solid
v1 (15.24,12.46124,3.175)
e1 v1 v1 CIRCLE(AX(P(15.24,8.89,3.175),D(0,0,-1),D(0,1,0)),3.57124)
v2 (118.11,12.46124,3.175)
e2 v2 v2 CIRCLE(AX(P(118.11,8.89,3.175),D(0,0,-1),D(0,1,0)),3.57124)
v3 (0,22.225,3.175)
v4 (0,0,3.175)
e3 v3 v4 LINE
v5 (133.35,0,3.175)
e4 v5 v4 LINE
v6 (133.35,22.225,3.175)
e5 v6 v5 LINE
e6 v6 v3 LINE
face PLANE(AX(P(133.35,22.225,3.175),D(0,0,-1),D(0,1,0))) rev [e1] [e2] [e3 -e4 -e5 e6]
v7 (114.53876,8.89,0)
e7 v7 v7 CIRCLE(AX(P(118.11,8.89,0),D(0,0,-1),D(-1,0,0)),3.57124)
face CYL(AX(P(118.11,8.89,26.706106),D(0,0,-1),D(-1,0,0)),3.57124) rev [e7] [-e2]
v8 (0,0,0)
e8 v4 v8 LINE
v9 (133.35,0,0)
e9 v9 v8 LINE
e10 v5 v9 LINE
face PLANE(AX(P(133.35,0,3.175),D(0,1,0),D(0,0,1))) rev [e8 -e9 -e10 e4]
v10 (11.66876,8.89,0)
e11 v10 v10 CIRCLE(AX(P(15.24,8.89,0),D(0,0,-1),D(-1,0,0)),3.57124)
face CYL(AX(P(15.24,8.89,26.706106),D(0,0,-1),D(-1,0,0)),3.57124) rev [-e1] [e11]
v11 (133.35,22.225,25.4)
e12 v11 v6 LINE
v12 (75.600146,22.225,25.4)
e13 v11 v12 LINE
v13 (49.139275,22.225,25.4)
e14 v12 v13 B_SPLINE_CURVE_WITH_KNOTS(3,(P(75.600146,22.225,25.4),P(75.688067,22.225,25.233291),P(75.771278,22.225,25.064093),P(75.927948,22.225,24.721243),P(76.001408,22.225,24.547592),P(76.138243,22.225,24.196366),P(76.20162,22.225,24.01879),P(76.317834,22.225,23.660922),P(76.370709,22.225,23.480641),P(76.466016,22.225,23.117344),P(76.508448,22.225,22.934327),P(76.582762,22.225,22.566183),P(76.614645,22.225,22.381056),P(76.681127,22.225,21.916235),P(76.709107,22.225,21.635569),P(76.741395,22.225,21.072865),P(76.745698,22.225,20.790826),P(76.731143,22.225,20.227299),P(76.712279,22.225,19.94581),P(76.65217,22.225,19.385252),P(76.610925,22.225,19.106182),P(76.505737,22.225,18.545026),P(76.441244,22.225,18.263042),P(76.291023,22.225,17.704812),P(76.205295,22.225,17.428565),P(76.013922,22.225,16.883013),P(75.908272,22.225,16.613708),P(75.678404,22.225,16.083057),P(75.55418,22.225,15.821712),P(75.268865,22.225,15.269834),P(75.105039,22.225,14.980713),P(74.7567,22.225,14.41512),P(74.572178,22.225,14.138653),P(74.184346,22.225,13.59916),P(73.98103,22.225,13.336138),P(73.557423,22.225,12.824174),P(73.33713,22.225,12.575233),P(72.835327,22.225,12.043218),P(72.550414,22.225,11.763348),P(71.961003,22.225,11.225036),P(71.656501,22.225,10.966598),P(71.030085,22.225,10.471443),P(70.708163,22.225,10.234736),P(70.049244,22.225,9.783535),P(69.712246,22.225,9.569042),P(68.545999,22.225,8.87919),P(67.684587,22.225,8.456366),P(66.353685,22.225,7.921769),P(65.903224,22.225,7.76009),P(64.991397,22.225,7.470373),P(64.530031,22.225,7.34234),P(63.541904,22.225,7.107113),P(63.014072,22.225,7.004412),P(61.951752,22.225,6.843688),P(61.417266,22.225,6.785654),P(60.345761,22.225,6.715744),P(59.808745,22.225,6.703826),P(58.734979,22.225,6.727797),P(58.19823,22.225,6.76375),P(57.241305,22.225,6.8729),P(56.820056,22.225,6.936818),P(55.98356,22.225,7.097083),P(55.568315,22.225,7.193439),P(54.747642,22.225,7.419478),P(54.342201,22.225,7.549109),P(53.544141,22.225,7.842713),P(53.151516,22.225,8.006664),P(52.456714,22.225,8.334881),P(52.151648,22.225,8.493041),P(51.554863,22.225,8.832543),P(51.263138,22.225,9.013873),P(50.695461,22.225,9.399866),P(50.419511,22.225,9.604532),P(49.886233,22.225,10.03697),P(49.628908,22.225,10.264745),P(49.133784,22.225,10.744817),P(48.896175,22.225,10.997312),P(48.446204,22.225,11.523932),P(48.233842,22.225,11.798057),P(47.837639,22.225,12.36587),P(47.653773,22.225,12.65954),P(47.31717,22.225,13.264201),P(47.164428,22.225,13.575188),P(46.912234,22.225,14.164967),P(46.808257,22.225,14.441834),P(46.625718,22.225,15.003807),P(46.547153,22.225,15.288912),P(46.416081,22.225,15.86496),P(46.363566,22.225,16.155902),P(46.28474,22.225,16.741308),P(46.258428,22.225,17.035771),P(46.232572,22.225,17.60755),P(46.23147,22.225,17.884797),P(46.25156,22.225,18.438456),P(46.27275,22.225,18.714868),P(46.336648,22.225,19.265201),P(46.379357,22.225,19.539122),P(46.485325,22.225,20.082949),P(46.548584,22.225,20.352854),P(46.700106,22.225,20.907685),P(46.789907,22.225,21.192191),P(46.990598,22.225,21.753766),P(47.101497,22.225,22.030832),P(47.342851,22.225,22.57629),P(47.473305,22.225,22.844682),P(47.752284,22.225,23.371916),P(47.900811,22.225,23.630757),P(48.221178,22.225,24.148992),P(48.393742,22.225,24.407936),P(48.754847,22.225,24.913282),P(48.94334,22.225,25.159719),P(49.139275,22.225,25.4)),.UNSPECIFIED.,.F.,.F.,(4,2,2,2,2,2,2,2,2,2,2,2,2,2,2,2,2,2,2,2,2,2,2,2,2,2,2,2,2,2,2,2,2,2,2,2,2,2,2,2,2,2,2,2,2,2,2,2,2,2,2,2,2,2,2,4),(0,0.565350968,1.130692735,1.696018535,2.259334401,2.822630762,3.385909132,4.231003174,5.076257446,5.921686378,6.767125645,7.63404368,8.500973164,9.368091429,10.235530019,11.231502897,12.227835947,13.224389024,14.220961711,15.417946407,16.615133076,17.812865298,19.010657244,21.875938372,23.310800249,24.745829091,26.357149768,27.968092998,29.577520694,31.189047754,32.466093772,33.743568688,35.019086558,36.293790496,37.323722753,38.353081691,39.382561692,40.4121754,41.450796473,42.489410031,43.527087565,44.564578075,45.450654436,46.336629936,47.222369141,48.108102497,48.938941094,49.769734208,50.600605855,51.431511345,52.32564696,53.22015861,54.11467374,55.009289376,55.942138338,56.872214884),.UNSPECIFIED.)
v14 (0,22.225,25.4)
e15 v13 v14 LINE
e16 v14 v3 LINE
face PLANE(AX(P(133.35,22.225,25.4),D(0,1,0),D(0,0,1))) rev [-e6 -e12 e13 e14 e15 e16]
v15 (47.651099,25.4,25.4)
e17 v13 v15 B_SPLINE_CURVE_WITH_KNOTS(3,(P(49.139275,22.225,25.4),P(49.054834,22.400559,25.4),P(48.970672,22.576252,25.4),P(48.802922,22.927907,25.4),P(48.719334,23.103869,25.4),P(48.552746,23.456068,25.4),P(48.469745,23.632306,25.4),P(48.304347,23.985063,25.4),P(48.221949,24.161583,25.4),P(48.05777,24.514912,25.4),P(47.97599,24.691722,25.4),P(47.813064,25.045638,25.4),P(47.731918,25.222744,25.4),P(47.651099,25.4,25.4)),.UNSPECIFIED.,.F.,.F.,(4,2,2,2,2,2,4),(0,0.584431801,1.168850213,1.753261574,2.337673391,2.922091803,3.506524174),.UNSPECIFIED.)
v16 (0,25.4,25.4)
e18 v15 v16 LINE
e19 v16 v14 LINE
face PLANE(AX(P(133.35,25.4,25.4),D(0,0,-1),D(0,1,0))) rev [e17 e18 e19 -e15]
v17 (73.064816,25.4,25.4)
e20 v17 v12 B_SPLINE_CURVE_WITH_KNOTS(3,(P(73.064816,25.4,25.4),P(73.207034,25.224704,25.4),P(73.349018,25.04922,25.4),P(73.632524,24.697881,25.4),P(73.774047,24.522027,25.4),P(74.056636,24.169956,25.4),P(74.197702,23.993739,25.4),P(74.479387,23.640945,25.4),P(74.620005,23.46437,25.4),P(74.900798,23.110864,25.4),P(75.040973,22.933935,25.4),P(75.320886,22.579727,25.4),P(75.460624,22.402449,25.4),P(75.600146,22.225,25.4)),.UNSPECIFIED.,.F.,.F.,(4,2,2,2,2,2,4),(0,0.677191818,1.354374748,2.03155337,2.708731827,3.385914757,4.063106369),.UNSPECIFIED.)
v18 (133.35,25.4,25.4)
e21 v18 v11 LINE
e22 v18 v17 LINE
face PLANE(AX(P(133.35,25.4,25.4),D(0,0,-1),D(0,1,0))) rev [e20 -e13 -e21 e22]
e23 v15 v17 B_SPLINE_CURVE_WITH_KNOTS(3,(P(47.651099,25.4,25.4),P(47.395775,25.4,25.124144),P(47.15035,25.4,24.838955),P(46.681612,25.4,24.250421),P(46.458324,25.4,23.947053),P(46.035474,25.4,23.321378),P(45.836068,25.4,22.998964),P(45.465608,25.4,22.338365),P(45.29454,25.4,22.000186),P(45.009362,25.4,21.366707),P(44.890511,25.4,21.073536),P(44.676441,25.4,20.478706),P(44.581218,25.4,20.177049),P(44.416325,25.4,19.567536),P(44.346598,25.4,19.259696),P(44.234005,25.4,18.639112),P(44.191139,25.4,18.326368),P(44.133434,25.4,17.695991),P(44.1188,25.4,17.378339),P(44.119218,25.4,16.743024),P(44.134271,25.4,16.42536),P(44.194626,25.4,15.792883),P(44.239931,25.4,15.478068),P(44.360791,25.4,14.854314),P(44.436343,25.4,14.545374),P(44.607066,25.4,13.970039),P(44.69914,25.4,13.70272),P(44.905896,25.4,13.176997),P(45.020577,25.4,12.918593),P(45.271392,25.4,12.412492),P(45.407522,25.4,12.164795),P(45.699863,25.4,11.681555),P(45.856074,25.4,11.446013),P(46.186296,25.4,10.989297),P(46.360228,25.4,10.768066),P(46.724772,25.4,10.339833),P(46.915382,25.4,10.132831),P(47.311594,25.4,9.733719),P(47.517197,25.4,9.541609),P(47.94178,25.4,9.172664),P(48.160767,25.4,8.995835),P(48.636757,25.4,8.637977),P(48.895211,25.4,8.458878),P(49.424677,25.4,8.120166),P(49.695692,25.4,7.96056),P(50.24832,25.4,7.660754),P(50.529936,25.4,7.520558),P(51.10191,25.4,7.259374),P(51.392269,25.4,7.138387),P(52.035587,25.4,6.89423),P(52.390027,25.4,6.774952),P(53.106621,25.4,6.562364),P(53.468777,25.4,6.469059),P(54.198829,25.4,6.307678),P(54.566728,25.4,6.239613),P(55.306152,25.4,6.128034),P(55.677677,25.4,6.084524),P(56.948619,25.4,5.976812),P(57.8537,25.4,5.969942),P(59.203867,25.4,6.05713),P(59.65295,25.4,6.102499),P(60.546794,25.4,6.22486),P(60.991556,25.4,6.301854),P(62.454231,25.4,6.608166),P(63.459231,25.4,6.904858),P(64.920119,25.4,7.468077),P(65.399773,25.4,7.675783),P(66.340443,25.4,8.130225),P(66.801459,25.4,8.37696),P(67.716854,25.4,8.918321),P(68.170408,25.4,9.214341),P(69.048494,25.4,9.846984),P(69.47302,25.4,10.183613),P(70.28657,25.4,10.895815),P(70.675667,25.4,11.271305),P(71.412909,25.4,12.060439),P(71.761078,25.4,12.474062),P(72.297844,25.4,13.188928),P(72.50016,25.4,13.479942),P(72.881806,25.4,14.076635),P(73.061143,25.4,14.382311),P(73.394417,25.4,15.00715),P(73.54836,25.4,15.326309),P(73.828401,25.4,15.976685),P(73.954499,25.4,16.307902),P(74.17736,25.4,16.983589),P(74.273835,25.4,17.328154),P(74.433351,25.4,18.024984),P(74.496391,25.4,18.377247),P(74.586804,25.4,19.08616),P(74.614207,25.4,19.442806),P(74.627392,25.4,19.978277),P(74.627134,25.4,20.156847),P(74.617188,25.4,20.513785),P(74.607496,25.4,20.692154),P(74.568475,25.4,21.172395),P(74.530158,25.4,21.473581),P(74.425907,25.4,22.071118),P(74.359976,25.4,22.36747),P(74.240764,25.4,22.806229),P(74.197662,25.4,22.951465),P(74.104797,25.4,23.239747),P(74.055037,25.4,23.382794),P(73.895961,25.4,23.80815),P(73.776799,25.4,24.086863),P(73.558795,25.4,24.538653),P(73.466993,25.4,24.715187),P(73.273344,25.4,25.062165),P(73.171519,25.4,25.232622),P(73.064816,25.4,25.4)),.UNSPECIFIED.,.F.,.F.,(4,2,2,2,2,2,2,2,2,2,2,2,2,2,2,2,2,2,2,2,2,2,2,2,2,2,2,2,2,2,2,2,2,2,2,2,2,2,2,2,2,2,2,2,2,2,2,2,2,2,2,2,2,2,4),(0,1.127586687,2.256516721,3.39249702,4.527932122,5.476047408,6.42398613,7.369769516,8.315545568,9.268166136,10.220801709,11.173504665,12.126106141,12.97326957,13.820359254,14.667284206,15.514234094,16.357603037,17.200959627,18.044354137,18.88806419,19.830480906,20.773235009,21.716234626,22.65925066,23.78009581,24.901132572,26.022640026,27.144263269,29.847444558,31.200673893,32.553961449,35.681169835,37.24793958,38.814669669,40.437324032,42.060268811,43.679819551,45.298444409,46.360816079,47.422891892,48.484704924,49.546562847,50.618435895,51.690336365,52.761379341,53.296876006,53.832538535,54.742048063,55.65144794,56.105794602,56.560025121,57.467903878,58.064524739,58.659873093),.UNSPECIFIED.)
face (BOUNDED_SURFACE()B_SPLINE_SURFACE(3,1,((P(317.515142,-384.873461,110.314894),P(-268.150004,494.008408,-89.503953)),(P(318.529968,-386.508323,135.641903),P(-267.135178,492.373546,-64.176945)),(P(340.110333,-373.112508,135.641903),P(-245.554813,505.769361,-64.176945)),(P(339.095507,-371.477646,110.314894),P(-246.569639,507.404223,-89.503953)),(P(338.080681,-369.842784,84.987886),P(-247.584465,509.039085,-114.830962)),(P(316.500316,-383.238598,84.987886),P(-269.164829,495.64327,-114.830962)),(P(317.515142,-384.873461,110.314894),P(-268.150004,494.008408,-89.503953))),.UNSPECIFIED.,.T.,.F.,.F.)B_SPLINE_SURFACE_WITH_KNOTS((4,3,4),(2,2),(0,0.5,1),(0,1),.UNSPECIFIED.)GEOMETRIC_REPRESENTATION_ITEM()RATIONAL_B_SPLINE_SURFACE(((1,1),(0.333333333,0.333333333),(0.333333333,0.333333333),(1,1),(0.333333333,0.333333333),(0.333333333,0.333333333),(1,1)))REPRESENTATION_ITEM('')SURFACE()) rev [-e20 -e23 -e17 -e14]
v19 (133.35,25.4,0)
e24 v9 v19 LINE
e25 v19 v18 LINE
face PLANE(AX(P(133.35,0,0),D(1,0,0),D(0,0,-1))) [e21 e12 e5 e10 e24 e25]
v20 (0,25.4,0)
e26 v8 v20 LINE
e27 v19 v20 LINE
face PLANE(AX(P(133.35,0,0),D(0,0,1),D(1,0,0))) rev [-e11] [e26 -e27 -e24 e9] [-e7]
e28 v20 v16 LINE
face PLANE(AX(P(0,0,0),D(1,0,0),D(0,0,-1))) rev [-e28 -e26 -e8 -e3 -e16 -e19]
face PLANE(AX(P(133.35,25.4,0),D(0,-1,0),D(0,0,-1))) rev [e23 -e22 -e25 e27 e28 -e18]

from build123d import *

# Parameters (mm, degrees)
BOSS_EXTRUDE1_DEPTH = 133.35
SKETCH5_R           = 3.57124
CUT_EXTRUDE1_DEPTH  = 139.103376269


with BuildPart() as part:
    # Sketch1 → Boss-Extrude1 (new body)
    with BuildSketch(Plane(origin=(0, 0, 0), x_dir=(0, 0, -1), z_dir=(1, 0, 0))):
        Polygon((0, 0), (0, 25.4), (-25.4, 25.4), (-25.4, 22.225), (-3.175, 22.225), (-3.175, 0), align=None)
    extrude(amount=BOSS_EXTRUDE1_DEPTH)

    # Cut-Sweep1: read off the stored shape, not the designer's step
    # Cut-Sweep1: loft between two sections, ruled curve by curve
    cut_sweep1_from = [
        Edge.make_bspline([(317.515141944, -384.873460742, 110.314894304), (318.529967826, -386.50832307, 135.641902686), (340.110332702, -373.112508356, 135.641902686), (339.095506819, -371.477646028, 110.314894304), (338.080680937, -369.8427837, 84.987885922), (316.500316061, -383.238598413, 84.987885922), (317.515141944, -384.873460742, 110.314894304)], [0, 0, 0, 0, 0.5, 0.5, 0.5, 1, 1, 1, 1], 3, [1, 0.333333333, 0.333333333, 1, 0.333333333, 0.333333333, 1]),
    ]
    cut_sweep1_to = [
        Edge.make_bspline([(-268.15000351, 494.008408115, -89.503953221), (-267.135177627, 492.373545787, -64.176944839), (-245.554812752, 505.769360501, -64.176944839), (-246.569638634, 507.404222829, -89.503953221), (-247.584464517, 509.039085157, -114.830961603), (-269.164829392, 495.643270444, -114.830961603), (-268.15000351, 494.008408115, -89.503953221)], [0, 0, 0, 0, 0.5, 0.5, 0.5, 1, 1, 1, 1], 3, [1, 0.333333333, 0.333333333, 1, 0.333333333, 0.333333333, 1]),
    ]
    cut_sweep1 = Solid(Shell([*[Face.make_surface_from_curves(cut_sweep1_from[k], cut_sweep1_to[k]) for k in range(1)], Face(Wire(cut_sweep1_from)), Face(Wire(cut_sweep1_to))]))
    add(cut_sweep1, mode=Mode.SUBTRACT)

    # Sketch5 → Cut-Extrude1 (cut, through all)
    with BuildSketch(Plane(origin=(0, 0, 0), x_dir=(-1, 0, 0), z_dir=(0, 0, -1))):
        with Locations((-118.11, 8.89)):
            Circle(SKETCH5_R)
        with Locations((-15.24, 8.89)):
            Circle(SKETCH5_R)
    extrude(amount=-CUT_EXTRUDE1_DEPTH, mode=Mode.SUBTRACT)


solid = part.part
